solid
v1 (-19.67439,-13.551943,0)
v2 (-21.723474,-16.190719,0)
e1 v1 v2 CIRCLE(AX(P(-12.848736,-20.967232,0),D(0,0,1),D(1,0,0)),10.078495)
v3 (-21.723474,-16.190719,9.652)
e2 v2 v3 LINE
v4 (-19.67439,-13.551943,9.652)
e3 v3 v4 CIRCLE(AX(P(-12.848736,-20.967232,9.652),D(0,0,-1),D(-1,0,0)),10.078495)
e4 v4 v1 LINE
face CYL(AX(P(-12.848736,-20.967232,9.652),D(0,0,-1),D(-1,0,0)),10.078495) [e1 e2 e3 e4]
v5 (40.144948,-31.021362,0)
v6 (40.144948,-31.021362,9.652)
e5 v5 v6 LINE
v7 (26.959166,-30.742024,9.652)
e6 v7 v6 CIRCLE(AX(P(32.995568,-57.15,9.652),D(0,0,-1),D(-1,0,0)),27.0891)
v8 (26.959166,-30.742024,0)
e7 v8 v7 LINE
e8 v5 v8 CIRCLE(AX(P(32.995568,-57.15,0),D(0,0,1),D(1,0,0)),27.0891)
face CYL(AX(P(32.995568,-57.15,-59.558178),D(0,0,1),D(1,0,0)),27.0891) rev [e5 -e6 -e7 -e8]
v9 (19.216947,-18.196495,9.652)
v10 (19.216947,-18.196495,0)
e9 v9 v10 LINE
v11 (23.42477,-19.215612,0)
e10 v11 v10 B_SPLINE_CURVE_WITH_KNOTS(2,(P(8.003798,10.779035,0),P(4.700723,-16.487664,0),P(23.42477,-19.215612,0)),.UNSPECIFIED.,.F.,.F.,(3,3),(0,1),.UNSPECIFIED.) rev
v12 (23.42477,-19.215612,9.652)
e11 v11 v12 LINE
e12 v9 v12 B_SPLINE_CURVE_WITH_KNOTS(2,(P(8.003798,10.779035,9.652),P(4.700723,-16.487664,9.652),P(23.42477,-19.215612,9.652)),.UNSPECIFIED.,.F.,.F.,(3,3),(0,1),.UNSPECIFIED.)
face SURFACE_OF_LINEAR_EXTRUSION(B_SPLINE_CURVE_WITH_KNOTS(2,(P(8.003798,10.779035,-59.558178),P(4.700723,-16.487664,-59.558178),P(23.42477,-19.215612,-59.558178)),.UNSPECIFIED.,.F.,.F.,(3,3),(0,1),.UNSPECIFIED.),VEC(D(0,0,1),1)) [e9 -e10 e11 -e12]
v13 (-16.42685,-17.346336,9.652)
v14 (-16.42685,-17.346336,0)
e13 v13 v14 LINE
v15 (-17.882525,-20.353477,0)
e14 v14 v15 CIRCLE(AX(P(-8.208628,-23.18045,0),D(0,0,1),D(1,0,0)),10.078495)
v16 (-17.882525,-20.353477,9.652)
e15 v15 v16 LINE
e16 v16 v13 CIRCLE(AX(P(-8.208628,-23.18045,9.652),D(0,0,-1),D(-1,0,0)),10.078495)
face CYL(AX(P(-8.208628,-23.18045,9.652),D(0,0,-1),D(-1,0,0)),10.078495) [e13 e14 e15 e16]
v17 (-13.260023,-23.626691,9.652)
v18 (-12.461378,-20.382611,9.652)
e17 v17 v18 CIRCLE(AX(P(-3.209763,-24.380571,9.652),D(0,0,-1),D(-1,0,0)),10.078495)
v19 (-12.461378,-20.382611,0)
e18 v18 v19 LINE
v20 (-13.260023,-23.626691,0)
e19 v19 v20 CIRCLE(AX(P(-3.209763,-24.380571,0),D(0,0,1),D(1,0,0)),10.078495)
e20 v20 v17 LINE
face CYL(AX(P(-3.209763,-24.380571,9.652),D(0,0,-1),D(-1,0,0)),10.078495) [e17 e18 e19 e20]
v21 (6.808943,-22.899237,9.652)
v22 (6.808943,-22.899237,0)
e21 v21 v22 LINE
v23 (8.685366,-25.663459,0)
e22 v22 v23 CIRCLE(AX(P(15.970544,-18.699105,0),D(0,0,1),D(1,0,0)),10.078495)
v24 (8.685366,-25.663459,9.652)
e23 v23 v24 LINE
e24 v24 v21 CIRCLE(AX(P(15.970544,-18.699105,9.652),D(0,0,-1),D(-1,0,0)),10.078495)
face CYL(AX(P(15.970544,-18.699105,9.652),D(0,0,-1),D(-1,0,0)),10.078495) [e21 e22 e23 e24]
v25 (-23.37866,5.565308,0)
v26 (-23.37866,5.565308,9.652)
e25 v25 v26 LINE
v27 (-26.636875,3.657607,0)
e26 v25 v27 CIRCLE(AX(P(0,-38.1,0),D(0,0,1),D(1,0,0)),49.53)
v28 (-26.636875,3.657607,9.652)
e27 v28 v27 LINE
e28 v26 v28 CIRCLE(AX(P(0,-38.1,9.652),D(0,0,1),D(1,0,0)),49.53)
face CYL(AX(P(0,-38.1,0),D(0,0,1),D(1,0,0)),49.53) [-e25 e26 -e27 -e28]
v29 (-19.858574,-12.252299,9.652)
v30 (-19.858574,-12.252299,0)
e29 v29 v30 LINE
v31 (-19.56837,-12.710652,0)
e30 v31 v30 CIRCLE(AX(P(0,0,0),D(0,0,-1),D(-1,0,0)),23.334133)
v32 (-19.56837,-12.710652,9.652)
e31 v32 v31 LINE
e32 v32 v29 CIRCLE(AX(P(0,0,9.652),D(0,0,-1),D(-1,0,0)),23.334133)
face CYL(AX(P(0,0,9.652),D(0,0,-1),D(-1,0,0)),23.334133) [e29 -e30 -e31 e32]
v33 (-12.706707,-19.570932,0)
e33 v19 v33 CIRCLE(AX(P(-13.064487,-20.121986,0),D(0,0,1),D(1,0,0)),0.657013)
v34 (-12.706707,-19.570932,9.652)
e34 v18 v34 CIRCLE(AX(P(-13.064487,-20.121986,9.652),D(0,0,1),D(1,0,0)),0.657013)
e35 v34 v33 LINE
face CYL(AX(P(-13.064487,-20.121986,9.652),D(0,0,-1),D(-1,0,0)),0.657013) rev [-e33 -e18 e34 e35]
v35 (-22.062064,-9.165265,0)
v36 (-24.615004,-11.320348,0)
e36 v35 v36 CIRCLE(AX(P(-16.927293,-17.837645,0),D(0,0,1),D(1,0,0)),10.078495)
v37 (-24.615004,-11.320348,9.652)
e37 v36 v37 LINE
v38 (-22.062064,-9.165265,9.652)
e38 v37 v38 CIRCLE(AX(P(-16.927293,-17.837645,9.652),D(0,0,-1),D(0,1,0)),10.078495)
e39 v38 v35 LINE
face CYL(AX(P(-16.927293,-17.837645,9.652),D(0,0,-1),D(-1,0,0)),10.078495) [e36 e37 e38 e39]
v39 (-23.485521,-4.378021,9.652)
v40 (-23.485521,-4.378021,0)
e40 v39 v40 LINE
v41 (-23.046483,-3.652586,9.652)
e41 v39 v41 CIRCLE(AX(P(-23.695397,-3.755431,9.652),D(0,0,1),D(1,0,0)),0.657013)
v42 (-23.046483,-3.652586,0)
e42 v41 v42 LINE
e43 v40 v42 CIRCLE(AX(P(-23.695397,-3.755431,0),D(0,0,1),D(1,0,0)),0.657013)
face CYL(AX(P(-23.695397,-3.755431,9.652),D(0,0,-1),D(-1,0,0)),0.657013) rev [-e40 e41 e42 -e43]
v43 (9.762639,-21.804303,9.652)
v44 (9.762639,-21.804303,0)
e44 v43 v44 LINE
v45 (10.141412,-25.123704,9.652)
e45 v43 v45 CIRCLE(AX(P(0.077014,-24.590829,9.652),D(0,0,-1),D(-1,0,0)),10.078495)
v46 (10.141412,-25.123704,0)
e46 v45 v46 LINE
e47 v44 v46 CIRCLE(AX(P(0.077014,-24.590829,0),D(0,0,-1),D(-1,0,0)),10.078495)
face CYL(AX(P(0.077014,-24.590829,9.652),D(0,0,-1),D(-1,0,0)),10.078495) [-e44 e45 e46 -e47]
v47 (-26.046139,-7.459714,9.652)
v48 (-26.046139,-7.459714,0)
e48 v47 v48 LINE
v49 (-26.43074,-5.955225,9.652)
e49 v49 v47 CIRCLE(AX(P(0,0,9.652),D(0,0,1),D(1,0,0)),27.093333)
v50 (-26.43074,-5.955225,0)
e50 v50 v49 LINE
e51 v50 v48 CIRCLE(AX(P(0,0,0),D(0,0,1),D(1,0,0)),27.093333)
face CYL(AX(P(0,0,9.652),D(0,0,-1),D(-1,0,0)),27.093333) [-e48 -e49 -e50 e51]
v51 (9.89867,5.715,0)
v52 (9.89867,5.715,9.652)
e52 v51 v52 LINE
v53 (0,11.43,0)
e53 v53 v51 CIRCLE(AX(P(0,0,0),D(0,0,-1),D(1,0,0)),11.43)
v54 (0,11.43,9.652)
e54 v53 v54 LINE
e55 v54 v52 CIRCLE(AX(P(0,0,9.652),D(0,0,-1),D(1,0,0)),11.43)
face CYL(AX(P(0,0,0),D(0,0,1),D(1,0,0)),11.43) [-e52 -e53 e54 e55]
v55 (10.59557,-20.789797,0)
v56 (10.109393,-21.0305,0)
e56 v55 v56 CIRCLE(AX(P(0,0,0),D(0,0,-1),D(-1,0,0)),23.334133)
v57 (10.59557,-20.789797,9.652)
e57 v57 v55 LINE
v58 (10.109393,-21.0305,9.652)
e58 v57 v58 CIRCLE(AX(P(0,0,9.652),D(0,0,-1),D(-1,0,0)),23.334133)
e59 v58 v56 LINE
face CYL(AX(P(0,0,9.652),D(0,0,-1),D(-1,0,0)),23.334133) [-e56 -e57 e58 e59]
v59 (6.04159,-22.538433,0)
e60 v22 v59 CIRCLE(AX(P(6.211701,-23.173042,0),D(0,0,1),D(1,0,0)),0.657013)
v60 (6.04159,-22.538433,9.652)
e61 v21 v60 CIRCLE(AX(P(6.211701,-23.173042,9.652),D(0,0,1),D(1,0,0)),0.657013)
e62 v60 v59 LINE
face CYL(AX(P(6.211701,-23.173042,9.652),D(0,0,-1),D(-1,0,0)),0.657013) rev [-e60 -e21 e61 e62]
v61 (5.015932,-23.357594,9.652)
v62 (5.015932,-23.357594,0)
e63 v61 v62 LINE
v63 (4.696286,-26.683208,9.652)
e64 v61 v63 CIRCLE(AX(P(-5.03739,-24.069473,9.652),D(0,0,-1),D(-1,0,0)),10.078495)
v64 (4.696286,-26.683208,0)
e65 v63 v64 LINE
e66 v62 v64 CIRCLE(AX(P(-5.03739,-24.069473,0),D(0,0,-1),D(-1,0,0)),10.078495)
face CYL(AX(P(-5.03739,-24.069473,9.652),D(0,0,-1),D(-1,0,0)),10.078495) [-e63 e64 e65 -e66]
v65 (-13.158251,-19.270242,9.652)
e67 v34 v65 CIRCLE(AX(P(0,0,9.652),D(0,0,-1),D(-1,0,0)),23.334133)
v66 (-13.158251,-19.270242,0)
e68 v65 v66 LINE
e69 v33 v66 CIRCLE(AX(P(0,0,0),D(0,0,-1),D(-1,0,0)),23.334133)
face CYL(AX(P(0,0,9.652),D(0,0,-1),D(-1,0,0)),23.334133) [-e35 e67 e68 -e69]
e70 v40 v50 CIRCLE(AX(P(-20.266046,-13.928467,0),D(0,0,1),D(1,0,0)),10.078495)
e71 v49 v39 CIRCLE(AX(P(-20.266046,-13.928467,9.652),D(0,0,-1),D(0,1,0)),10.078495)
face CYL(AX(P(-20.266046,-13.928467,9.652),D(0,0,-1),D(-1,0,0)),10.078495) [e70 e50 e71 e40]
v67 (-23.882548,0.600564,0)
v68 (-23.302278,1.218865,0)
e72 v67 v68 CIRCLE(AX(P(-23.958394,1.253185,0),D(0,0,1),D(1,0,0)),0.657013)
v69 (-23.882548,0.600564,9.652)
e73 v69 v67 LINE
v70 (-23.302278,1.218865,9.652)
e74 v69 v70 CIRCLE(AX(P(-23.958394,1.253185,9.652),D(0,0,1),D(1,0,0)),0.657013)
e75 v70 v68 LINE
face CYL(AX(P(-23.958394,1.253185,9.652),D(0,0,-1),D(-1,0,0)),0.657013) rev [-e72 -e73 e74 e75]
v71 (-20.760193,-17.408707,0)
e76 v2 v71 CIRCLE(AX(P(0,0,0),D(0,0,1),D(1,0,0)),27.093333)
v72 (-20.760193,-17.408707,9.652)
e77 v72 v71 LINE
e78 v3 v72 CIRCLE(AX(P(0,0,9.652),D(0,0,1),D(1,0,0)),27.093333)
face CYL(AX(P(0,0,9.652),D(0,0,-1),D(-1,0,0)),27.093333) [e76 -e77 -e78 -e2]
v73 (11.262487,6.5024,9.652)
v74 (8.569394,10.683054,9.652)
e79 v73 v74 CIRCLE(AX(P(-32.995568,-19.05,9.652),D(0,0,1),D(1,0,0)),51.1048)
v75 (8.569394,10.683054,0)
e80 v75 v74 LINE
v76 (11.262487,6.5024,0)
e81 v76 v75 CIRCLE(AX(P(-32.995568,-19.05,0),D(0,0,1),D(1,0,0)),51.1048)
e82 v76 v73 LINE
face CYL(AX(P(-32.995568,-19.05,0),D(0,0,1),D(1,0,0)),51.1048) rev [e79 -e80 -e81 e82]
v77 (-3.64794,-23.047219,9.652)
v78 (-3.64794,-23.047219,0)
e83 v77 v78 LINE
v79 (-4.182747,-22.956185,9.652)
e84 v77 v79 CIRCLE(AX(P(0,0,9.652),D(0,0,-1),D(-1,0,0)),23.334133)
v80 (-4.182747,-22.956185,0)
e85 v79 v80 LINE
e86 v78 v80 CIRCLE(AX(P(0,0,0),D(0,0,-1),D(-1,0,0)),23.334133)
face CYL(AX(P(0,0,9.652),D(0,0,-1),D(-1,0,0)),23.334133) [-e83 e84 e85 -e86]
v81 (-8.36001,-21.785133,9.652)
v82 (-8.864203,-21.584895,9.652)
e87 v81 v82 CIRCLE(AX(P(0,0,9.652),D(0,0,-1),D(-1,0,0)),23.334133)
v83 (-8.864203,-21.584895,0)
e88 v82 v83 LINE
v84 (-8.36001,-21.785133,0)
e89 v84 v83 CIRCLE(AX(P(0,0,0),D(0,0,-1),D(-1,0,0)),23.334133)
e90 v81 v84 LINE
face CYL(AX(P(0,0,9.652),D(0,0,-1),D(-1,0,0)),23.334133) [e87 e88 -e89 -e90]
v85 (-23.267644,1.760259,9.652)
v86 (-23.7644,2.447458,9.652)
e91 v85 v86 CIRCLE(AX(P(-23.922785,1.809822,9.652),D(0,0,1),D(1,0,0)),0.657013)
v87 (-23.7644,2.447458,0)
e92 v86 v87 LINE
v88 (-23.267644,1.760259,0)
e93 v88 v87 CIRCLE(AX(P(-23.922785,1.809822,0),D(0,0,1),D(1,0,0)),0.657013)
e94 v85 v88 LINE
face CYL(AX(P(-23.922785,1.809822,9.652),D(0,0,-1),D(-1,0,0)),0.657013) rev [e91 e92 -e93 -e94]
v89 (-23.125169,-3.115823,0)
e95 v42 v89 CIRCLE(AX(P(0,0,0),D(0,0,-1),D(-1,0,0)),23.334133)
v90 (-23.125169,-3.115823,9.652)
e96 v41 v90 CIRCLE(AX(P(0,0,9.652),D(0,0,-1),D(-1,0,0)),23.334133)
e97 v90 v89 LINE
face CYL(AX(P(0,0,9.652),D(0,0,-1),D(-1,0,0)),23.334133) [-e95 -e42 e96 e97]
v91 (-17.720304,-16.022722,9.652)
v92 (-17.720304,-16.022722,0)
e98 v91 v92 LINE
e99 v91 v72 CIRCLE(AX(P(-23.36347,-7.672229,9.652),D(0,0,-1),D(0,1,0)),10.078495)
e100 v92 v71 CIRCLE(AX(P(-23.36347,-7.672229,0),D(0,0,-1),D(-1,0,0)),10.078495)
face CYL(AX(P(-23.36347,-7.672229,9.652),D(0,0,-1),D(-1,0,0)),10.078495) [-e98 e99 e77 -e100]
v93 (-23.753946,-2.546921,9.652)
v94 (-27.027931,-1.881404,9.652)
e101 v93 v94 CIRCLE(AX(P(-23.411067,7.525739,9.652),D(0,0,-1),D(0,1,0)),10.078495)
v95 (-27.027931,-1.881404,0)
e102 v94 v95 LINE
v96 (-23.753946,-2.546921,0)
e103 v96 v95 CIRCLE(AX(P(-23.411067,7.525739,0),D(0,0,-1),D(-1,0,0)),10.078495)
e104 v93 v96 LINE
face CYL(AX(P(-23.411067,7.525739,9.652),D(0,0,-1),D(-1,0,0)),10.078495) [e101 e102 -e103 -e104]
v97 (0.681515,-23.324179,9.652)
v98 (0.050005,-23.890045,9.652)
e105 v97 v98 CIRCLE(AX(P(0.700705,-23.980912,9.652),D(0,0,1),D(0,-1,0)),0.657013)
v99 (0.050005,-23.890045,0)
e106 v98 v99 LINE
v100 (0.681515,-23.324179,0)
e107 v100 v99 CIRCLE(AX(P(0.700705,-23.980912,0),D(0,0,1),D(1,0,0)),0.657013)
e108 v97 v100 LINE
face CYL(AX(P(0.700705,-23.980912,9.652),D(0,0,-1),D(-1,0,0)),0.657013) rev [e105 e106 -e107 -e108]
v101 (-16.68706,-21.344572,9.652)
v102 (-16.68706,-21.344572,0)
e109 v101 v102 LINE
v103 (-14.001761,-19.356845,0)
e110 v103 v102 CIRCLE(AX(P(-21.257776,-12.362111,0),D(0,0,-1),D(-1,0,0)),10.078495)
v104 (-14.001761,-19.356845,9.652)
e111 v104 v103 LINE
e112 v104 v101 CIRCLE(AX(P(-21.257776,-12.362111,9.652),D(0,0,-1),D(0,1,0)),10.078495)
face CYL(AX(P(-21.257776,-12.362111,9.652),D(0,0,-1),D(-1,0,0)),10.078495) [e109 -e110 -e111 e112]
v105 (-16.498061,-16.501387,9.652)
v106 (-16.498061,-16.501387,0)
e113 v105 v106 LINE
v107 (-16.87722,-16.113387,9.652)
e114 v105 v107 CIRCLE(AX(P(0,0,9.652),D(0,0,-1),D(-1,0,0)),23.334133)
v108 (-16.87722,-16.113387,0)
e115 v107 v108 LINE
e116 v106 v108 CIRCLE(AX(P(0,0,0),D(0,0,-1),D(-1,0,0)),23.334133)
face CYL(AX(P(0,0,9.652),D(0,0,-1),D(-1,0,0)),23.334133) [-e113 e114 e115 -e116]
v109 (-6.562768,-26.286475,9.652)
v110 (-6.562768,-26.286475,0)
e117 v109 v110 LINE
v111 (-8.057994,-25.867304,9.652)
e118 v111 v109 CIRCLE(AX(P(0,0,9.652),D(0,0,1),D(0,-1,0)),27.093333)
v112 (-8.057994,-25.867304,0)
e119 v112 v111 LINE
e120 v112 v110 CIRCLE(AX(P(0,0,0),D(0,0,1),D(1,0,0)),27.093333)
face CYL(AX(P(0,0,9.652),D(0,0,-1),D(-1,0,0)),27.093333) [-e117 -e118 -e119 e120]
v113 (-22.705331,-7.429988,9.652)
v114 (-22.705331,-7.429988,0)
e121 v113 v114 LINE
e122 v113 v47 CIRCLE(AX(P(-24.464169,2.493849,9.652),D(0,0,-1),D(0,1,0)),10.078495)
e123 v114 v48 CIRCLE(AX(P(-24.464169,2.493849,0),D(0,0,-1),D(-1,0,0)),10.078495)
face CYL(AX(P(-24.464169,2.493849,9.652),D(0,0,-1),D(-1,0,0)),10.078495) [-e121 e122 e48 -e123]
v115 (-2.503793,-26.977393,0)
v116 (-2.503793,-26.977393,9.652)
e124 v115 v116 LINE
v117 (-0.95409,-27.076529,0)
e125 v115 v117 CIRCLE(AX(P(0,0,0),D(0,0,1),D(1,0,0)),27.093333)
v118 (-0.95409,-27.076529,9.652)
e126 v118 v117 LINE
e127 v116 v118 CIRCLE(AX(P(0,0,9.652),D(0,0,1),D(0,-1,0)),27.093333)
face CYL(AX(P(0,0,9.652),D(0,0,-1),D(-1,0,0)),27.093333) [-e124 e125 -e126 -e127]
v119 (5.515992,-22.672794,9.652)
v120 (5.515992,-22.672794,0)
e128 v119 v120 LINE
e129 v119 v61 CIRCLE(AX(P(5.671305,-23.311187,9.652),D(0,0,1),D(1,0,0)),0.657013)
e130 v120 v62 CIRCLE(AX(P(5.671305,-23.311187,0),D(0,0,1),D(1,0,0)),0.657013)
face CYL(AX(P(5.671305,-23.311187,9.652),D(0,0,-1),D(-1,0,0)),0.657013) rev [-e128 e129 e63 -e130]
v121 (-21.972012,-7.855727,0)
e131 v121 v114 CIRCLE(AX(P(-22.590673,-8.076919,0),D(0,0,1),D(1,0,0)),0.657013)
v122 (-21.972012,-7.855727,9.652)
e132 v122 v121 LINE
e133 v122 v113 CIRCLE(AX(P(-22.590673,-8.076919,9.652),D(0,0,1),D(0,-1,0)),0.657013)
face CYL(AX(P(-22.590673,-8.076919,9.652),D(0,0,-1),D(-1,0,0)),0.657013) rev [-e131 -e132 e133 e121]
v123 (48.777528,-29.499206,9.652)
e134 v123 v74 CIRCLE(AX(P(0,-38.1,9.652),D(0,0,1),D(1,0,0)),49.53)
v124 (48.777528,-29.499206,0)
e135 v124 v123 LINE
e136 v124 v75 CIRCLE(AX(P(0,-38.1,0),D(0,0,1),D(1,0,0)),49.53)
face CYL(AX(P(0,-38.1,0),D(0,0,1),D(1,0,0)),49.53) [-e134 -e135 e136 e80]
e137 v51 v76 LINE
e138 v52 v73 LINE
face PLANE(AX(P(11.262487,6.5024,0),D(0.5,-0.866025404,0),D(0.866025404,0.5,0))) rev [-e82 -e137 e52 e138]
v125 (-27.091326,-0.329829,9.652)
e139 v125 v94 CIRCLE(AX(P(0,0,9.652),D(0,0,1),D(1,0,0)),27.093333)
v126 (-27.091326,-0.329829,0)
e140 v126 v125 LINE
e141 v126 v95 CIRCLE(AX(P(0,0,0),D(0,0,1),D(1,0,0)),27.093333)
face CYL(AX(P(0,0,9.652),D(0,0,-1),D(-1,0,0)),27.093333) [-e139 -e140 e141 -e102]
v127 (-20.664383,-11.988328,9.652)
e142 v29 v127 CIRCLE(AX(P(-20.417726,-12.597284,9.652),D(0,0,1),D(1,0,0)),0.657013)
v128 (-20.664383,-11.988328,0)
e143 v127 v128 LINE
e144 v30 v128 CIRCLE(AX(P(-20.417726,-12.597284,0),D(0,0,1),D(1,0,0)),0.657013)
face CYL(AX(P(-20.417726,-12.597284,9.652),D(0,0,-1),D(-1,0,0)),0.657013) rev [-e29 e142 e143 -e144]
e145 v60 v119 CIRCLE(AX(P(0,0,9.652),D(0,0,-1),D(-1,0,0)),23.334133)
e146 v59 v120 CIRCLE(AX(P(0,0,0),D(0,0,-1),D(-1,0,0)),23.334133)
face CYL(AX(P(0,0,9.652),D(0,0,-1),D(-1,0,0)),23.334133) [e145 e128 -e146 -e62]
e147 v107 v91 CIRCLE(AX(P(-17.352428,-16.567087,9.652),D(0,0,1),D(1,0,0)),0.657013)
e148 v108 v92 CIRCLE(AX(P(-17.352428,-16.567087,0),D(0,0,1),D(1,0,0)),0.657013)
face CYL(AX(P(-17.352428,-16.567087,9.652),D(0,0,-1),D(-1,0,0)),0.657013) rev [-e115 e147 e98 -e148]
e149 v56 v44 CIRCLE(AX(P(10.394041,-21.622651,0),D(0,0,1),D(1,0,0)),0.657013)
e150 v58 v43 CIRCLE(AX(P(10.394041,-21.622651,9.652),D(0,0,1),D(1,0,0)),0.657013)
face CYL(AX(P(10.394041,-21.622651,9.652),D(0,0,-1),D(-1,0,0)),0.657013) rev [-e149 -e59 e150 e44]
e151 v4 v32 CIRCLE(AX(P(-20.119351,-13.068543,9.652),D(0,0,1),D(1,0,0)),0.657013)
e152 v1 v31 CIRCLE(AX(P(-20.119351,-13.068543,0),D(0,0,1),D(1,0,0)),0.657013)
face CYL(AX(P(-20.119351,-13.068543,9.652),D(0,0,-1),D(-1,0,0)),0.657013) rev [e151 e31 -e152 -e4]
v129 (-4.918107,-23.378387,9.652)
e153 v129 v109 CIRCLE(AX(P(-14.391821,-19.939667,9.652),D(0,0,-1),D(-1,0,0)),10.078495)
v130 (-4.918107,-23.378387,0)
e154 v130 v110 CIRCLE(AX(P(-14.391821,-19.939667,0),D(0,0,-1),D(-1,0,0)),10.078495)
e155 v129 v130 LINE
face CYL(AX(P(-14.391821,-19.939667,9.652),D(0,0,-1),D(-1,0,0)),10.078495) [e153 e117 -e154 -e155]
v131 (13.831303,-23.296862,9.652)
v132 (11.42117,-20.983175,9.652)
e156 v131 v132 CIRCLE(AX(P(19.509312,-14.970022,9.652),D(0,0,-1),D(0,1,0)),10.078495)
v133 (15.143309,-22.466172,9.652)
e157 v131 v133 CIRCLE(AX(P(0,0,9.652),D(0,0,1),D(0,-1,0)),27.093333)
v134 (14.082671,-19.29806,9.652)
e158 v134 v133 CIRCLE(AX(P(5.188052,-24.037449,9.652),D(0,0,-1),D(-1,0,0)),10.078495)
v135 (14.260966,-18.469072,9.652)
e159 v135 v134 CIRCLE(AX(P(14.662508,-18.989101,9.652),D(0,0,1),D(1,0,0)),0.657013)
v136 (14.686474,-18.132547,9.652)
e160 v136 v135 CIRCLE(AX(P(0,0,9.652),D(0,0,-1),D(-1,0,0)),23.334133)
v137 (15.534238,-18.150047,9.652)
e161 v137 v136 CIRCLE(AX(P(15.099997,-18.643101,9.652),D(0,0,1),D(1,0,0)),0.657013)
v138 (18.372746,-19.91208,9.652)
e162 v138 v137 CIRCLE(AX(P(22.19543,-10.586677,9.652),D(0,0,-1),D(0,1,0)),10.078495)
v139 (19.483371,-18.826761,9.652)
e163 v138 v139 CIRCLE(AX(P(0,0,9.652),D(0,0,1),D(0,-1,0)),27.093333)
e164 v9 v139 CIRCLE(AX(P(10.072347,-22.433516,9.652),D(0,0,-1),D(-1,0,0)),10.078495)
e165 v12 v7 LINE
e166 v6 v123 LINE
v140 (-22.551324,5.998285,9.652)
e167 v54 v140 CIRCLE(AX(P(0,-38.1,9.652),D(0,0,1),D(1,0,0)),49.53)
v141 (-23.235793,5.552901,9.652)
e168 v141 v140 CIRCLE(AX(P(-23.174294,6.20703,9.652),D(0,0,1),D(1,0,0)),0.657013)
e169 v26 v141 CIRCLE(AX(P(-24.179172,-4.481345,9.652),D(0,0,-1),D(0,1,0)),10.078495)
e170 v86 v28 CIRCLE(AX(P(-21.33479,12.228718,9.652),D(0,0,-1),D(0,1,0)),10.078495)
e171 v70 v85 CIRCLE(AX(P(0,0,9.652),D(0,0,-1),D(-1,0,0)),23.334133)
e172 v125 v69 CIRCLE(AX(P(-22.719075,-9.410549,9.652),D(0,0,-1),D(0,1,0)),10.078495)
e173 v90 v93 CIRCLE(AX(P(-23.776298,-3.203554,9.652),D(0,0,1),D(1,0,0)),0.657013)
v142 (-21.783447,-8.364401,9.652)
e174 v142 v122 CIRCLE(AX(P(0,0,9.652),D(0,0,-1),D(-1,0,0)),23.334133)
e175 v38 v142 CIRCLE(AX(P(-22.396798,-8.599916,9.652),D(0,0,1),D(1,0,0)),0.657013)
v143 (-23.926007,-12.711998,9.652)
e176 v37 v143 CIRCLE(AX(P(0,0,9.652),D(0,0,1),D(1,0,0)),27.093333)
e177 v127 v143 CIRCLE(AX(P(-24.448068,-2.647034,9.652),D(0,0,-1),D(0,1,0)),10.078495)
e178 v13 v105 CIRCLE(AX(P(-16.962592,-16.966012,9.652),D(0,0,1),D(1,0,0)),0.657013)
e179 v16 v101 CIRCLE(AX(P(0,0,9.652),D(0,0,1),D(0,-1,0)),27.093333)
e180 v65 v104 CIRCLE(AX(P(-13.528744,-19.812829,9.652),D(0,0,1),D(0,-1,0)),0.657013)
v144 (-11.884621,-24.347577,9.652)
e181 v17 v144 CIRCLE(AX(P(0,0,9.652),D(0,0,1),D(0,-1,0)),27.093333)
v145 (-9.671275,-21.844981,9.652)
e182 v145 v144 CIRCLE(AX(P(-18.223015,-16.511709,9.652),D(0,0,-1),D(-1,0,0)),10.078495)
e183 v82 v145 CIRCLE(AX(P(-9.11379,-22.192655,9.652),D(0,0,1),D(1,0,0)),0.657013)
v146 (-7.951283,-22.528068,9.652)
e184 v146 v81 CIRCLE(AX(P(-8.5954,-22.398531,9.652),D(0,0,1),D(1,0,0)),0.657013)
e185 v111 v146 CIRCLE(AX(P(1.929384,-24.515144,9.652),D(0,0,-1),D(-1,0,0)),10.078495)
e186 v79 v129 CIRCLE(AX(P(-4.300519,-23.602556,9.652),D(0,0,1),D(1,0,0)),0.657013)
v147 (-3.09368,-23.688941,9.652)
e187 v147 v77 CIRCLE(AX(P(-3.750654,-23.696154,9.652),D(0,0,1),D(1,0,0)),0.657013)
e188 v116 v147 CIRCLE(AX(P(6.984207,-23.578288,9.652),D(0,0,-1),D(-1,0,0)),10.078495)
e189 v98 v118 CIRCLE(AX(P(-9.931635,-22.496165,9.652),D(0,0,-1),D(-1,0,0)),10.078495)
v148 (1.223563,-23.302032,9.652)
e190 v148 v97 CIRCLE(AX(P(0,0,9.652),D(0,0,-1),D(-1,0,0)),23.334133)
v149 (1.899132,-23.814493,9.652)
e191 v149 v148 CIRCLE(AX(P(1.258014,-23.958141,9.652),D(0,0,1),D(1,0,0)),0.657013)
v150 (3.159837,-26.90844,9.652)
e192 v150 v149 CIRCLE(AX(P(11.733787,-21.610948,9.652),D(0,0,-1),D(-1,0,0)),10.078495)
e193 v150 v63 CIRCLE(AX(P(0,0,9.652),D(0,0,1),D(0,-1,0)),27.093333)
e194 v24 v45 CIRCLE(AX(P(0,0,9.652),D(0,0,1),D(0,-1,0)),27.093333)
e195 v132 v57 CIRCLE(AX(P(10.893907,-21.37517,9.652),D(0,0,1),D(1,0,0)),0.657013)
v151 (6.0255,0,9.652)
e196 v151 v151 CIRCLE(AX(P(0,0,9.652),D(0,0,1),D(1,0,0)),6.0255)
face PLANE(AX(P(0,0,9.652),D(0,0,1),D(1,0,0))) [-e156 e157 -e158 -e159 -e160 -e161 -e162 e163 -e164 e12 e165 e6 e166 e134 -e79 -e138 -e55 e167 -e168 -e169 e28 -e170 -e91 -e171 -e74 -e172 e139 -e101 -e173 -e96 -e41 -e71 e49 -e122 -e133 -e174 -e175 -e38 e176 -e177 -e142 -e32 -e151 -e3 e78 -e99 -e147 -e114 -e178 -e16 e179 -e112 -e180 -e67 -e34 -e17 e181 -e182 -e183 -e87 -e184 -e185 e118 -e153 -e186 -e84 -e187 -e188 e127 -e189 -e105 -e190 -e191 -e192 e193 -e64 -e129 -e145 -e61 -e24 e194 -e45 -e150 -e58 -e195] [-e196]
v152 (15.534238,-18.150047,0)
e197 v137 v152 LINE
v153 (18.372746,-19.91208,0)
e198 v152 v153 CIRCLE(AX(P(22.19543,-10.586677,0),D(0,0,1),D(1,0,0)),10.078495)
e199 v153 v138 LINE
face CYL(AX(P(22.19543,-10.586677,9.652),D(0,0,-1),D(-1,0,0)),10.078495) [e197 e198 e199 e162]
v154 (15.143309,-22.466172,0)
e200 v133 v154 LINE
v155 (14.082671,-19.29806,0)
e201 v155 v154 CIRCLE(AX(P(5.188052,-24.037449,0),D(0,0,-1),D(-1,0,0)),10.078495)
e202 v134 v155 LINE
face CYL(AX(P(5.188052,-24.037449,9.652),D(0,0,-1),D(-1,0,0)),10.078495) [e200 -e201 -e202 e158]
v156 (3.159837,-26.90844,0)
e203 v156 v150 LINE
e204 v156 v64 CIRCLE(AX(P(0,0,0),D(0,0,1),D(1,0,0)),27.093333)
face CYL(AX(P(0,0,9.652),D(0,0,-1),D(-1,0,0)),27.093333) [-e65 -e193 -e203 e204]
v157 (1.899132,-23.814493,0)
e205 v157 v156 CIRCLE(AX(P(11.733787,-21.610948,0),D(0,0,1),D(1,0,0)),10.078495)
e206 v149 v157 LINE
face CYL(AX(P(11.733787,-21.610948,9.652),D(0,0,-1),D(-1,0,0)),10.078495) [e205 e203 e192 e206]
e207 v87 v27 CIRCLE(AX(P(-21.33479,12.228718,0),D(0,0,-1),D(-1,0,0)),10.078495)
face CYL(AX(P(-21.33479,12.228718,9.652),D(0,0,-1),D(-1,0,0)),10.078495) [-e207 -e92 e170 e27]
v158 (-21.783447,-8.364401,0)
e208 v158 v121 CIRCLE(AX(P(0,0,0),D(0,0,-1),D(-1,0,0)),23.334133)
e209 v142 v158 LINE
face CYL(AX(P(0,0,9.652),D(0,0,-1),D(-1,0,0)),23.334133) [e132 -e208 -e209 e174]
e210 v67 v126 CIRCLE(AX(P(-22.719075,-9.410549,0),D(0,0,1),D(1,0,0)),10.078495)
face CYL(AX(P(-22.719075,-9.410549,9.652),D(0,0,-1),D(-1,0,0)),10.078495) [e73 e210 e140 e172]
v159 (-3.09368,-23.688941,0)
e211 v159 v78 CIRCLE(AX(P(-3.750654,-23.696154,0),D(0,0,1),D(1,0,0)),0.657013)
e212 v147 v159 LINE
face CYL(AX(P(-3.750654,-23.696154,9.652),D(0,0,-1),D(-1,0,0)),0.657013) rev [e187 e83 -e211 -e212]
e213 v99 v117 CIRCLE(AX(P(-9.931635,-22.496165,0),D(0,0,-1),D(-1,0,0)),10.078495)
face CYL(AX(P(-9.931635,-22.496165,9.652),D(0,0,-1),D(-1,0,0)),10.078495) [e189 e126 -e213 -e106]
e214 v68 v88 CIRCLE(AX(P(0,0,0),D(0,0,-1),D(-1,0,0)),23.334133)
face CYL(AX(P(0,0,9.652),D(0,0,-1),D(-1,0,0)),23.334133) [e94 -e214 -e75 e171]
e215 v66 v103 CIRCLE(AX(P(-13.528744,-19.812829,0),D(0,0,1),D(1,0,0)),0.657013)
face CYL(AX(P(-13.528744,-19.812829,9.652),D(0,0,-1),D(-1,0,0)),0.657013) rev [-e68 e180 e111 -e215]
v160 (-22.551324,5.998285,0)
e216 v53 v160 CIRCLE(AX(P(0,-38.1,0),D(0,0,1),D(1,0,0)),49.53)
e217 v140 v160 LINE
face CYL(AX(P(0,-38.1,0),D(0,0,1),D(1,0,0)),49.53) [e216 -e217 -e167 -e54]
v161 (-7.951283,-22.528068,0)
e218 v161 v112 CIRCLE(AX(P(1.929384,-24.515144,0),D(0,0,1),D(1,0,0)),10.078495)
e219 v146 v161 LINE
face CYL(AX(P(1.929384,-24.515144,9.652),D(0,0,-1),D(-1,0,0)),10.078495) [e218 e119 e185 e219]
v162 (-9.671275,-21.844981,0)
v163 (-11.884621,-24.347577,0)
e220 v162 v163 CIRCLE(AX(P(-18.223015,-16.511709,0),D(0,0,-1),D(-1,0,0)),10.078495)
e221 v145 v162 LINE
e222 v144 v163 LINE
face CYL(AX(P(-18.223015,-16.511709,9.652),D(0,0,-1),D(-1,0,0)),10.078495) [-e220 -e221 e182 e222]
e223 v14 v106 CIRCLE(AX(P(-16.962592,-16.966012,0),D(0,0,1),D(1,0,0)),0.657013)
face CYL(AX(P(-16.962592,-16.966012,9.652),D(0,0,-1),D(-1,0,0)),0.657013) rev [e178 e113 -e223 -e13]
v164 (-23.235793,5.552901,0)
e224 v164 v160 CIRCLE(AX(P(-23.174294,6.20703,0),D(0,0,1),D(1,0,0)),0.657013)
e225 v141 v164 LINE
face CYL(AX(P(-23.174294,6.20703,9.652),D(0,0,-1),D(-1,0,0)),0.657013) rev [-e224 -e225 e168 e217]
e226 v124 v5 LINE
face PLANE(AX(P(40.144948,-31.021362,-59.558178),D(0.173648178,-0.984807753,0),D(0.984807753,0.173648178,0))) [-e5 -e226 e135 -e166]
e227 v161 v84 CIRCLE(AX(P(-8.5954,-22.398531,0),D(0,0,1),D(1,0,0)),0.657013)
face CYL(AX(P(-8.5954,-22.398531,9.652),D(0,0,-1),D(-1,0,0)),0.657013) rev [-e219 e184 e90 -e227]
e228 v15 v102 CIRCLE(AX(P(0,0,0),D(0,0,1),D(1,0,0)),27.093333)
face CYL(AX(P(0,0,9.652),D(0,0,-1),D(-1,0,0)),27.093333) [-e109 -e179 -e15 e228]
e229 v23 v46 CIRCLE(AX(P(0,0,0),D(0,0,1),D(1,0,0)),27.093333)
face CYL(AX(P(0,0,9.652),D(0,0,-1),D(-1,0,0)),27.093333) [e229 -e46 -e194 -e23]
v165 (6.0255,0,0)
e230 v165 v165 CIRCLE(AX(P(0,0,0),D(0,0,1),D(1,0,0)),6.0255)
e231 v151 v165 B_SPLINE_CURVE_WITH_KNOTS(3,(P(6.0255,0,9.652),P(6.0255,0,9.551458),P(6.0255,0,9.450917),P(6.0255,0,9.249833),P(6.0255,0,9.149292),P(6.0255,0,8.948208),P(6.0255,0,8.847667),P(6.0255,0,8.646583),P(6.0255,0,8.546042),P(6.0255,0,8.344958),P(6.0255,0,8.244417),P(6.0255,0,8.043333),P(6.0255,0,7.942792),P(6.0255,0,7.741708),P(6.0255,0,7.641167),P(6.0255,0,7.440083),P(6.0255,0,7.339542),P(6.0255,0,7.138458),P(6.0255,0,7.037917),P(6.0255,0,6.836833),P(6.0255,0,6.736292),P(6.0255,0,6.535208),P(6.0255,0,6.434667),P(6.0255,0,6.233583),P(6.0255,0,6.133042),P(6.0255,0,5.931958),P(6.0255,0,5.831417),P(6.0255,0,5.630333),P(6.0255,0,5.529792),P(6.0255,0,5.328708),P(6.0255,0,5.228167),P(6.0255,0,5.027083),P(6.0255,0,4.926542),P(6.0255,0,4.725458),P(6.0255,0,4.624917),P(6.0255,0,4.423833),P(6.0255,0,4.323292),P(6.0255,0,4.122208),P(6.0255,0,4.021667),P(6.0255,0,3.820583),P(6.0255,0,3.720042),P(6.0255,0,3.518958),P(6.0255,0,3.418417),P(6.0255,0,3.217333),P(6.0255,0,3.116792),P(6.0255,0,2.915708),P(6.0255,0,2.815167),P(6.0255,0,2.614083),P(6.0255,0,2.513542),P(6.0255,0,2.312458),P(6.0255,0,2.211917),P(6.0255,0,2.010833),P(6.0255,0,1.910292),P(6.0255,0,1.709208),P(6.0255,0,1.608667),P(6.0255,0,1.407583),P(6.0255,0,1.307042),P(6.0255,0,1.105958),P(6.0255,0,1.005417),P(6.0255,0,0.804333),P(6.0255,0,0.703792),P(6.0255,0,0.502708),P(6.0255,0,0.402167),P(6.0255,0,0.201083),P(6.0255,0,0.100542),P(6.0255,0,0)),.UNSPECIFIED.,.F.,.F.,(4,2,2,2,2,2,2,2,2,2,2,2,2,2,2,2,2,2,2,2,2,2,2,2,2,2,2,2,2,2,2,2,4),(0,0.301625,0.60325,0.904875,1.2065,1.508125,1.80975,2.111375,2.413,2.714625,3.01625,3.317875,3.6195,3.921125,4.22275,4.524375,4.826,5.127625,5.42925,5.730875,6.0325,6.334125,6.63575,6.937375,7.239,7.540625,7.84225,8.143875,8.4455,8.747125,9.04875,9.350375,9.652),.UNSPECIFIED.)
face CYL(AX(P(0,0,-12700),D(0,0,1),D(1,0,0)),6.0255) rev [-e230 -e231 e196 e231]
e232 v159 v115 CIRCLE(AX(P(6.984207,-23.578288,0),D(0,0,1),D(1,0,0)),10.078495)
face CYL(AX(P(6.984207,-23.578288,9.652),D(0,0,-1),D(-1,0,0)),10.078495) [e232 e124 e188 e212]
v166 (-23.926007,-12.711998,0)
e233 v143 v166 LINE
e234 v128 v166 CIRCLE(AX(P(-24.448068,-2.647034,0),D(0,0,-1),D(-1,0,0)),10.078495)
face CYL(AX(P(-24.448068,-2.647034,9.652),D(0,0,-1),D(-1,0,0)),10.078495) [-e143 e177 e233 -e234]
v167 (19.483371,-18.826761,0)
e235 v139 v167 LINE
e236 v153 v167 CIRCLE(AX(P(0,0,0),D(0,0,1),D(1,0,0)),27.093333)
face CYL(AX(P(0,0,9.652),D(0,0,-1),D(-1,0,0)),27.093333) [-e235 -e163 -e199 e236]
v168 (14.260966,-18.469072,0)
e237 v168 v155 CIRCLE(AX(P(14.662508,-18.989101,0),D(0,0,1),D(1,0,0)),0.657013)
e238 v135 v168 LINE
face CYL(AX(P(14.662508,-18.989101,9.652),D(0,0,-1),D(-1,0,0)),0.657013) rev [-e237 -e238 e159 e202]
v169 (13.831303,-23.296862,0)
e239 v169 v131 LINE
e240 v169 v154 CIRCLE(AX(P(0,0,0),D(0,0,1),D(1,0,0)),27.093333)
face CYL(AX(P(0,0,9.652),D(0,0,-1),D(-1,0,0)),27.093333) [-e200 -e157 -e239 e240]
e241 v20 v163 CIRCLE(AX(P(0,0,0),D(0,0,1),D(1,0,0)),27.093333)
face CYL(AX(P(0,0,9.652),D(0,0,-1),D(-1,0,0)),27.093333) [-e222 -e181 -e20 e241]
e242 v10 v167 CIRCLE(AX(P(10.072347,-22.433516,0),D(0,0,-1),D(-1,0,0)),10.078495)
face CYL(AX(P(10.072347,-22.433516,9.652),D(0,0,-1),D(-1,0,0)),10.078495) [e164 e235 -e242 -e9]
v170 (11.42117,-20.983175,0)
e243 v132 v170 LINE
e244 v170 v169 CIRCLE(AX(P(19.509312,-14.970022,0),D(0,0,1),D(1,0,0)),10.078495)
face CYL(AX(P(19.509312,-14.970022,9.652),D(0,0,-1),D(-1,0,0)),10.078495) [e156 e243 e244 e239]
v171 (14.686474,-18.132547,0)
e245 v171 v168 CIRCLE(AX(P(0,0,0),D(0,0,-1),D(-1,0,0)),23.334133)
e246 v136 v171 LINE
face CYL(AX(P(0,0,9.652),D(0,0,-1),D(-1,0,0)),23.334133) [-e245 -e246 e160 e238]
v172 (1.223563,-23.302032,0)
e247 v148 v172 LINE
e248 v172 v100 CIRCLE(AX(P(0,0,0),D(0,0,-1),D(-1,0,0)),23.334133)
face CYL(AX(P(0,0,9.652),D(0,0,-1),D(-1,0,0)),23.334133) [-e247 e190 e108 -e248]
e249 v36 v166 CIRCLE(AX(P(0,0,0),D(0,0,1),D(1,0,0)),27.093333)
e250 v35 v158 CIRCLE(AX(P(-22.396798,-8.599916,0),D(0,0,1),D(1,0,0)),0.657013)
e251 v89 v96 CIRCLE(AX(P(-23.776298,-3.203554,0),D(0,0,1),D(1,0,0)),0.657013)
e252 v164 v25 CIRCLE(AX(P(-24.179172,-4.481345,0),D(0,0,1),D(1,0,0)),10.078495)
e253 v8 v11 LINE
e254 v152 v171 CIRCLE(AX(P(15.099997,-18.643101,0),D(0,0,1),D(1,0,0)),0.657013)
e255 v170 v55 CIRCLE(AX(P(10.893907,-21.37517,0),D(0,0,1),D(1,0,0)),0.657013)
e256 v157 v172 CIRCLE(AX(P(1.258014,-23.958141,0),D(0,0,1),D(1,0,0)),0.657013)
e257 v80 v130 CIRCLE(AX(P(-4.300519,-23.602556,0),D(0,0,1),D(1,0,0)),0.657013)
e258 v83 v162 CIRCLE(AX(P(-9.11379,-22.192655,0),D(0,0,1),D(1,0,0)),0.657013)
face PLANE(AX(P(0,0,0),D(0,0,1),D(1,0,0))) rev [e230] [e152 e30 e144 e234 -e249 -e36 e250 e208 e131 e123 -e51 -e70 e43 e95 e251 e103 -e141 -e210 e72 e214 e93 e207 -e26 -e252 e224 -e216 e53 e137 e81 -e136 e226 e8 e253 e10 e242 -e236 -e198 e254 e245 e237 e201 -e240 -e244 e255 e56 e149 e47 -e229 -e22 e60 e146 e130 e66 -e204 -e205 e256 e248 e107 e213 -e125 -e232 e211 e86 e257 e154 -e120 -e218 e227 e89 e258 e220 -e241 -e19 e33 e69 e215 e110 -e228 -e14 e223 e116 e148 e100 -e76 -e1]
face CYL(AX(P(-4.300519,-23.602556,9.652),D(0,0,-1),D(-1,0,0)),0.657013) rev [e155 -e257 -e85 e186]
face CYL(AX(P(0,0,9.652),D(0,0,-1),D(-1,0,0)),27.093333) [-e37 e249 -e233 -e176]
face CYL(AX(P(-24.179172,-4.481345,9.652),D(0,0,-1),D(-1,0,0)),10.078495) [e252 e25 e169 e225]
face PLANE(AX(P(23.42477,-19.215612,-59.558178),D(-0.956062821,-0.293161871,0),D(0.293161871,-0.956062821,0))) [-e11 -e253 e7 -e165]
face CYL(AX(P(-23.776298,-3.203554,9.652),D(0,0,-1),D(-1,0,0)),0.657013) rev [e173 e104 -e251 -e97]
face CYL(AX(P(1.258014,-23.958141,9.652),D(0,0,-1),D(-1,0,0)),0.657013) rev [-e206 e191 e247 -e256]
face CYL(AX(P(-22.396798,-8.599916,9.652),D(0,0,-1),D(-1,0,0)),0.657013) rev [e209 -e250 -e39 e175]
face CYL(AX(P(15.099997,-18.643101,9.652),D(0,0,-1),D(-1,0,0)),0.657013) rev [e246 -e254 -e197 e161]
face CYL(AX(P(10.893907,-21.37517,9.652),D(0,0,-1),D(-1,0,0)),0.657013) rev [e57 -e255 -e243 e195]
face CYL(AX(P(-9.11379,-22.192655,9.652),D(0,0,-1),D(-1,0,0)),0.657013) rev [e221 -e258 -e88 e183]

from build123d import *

# Parameters (mm, degrees)
SKETCH3_R               = 40.64
GEARBODY_DEPTH          = 9.652
TOOTHCUT_DEPTH          = 59.278472046
CIRPATTERN1_COUNT       = 30
SCALE1_SCALE_X          = 0.666666667
SCALE1_SCALE_Y          = 0.666666667
SCALE1_SCALE_Z          = 1
BOREDIA_R               = 6.025500014
BORE_DEPTH              = 12700
CUT_EXTRUDE1_DEPTH      = 40.49986663
BOSS_EXTRUDE1_DEPTH     = 9.652
BODY_TUBE_CUT_OUT_DEPTH = 59.606597669


with BuildPart() as part:
    # Sketch3 → gearBody (new body)
    with BuildSketch(Plane.XY):
        Circle(SKETCH3_R)
    extrude(amount=GEARBODY_DEPTH)

    # Sketch2 → toothCut (cut, through all)
    with BuildSketch(Plane.XY):
        with BuildLine():
            ThreePointArc((34.901466352, -2.640387833), (34.929801576, -2.234493965), (34.953416534, -1.828298136))
            ThreePointArc((34.953416534, -1.828298136), (35.218972856, -1.205360668), (35.823821616, -0.900845929))
            ThreePointArc((35.823821616, -0.900845929), (41.902420255, 1.180053047), (46.567899911, 5.597382731))
            ThreePointArc((46.567899911, 5.597382731), (46.807414621, -2.994316622), (45.4750933, -11.485464069))
            ThreePointArc((45.4750933, -11.485464069), (41.410501506, -6.509663078), (35.646600115, -3.671187658))
            ThreePointArc((35.646600115, -3.671187658), (35.08548304, -3.292084932), (34.901466352, -2.640387833))
        make_face()
    toothcut = extrude(amount=TOOTHCUT_DEPTH, mode=Mode.SUBTRACT)

    # CirPattern1: toothCut ×30 about axis
    cirpattern1_axis = Axis((0, 0, 0), (0, 0, 1))
    for i in range(1, CIRPATTERN1_COUNT):
        add(toothcut.rotate(cirpattern1_axis, i * 360 / CIRPATTERN1_COUNT), mode=Mode.SUBTRACT)


with BuildPart() as part_1:
    # Scale1: scaled about (0, 0, 4.826)
    add(part.part.scale((SCALE1_SCALE_X, SCALE1_SCALE_Y, SCALE1_SCALE_Z), about=(0, 0, 4.826)))

    # boreDia → bore (cut, symmetric)
    with BuildSketch(Plane.XY):
        Circle(BOREDIA_R)
    extrude(amount=BORE_DEPTH, both=True, mode=Mode.SUBTRACT)

    # Sketch4 → Cut-Extrude1 (cut, through all)
    with BuildSketch(Plane.XY.offset(9.652)):
        with BuildLine():
            ThreePointArc((-27.126729009, 3.341060233), (0, 11.43), (27.126729009, 3.341060233))
            ThreePointArc((27.126729009, 3.341060233), (0, 27.33170522), (-27.126729009, 3.341060233))
        make_face()
    extrude(amount=-CUT_EXTRUDE1_DEPTH, mode=Mode.SUBTRACT)

    # Sketch5 → Boss-Extrude1 (add)
    with BuildSketch(Plane.XY.offset(9.652)):
        with BuildLine():
            Line((23.424769806, -19.215611802), (26.959165805, -30.742024145))
            ThreePointArc((26.959165805, -30.742024145), (33.569316663, -30.066976699), (40.144948283, -31.021362479))
            Line((40.144948283, -31.021362479), (48.777528007, -29.49920576))
            ThreePointArc((48.777528007, -29.49920576), (34.808245264, -2.863556342), (8.00379846, 10.779035488))
            add(Edge.make_bspline(
                [(8.00379846, 10.779035488), (4.700723166, -16.48766374), (23.424769806, -19.215611802)],
                knots=[0, 0, 0, 1, 1, 1], degree=2))
        make_face()
    extrude(amount=-BOSS_EXTRUDE1_DEPTH)

    # Sketch6 → Body Tube Cut Out (cut, through all)
    with BuildSketch(Plane.XY.offset(9.652)):
        with BuildLine():
            Line((11.262487171, 6.5024), (9.898670365, 5.715))
            ThreePointArc((9.898670365, 5.715), (5.715, 9.898670365), (0, 11.43))
            ThreePointArc((0, 11.43), (4.300943022, 11.242910221), (8.569394121, 10.683054275))
            ThreePointArc((8.569394121, 10.683054275), (9.966823016, 8.625504533), (11.262487171, 6.5024))
        make_face()
    extrude(amount=-BODY_TUBE_CUT_OUT_DEPTH, mode=Mode.SUBTRACT)


solid = part_1.part
